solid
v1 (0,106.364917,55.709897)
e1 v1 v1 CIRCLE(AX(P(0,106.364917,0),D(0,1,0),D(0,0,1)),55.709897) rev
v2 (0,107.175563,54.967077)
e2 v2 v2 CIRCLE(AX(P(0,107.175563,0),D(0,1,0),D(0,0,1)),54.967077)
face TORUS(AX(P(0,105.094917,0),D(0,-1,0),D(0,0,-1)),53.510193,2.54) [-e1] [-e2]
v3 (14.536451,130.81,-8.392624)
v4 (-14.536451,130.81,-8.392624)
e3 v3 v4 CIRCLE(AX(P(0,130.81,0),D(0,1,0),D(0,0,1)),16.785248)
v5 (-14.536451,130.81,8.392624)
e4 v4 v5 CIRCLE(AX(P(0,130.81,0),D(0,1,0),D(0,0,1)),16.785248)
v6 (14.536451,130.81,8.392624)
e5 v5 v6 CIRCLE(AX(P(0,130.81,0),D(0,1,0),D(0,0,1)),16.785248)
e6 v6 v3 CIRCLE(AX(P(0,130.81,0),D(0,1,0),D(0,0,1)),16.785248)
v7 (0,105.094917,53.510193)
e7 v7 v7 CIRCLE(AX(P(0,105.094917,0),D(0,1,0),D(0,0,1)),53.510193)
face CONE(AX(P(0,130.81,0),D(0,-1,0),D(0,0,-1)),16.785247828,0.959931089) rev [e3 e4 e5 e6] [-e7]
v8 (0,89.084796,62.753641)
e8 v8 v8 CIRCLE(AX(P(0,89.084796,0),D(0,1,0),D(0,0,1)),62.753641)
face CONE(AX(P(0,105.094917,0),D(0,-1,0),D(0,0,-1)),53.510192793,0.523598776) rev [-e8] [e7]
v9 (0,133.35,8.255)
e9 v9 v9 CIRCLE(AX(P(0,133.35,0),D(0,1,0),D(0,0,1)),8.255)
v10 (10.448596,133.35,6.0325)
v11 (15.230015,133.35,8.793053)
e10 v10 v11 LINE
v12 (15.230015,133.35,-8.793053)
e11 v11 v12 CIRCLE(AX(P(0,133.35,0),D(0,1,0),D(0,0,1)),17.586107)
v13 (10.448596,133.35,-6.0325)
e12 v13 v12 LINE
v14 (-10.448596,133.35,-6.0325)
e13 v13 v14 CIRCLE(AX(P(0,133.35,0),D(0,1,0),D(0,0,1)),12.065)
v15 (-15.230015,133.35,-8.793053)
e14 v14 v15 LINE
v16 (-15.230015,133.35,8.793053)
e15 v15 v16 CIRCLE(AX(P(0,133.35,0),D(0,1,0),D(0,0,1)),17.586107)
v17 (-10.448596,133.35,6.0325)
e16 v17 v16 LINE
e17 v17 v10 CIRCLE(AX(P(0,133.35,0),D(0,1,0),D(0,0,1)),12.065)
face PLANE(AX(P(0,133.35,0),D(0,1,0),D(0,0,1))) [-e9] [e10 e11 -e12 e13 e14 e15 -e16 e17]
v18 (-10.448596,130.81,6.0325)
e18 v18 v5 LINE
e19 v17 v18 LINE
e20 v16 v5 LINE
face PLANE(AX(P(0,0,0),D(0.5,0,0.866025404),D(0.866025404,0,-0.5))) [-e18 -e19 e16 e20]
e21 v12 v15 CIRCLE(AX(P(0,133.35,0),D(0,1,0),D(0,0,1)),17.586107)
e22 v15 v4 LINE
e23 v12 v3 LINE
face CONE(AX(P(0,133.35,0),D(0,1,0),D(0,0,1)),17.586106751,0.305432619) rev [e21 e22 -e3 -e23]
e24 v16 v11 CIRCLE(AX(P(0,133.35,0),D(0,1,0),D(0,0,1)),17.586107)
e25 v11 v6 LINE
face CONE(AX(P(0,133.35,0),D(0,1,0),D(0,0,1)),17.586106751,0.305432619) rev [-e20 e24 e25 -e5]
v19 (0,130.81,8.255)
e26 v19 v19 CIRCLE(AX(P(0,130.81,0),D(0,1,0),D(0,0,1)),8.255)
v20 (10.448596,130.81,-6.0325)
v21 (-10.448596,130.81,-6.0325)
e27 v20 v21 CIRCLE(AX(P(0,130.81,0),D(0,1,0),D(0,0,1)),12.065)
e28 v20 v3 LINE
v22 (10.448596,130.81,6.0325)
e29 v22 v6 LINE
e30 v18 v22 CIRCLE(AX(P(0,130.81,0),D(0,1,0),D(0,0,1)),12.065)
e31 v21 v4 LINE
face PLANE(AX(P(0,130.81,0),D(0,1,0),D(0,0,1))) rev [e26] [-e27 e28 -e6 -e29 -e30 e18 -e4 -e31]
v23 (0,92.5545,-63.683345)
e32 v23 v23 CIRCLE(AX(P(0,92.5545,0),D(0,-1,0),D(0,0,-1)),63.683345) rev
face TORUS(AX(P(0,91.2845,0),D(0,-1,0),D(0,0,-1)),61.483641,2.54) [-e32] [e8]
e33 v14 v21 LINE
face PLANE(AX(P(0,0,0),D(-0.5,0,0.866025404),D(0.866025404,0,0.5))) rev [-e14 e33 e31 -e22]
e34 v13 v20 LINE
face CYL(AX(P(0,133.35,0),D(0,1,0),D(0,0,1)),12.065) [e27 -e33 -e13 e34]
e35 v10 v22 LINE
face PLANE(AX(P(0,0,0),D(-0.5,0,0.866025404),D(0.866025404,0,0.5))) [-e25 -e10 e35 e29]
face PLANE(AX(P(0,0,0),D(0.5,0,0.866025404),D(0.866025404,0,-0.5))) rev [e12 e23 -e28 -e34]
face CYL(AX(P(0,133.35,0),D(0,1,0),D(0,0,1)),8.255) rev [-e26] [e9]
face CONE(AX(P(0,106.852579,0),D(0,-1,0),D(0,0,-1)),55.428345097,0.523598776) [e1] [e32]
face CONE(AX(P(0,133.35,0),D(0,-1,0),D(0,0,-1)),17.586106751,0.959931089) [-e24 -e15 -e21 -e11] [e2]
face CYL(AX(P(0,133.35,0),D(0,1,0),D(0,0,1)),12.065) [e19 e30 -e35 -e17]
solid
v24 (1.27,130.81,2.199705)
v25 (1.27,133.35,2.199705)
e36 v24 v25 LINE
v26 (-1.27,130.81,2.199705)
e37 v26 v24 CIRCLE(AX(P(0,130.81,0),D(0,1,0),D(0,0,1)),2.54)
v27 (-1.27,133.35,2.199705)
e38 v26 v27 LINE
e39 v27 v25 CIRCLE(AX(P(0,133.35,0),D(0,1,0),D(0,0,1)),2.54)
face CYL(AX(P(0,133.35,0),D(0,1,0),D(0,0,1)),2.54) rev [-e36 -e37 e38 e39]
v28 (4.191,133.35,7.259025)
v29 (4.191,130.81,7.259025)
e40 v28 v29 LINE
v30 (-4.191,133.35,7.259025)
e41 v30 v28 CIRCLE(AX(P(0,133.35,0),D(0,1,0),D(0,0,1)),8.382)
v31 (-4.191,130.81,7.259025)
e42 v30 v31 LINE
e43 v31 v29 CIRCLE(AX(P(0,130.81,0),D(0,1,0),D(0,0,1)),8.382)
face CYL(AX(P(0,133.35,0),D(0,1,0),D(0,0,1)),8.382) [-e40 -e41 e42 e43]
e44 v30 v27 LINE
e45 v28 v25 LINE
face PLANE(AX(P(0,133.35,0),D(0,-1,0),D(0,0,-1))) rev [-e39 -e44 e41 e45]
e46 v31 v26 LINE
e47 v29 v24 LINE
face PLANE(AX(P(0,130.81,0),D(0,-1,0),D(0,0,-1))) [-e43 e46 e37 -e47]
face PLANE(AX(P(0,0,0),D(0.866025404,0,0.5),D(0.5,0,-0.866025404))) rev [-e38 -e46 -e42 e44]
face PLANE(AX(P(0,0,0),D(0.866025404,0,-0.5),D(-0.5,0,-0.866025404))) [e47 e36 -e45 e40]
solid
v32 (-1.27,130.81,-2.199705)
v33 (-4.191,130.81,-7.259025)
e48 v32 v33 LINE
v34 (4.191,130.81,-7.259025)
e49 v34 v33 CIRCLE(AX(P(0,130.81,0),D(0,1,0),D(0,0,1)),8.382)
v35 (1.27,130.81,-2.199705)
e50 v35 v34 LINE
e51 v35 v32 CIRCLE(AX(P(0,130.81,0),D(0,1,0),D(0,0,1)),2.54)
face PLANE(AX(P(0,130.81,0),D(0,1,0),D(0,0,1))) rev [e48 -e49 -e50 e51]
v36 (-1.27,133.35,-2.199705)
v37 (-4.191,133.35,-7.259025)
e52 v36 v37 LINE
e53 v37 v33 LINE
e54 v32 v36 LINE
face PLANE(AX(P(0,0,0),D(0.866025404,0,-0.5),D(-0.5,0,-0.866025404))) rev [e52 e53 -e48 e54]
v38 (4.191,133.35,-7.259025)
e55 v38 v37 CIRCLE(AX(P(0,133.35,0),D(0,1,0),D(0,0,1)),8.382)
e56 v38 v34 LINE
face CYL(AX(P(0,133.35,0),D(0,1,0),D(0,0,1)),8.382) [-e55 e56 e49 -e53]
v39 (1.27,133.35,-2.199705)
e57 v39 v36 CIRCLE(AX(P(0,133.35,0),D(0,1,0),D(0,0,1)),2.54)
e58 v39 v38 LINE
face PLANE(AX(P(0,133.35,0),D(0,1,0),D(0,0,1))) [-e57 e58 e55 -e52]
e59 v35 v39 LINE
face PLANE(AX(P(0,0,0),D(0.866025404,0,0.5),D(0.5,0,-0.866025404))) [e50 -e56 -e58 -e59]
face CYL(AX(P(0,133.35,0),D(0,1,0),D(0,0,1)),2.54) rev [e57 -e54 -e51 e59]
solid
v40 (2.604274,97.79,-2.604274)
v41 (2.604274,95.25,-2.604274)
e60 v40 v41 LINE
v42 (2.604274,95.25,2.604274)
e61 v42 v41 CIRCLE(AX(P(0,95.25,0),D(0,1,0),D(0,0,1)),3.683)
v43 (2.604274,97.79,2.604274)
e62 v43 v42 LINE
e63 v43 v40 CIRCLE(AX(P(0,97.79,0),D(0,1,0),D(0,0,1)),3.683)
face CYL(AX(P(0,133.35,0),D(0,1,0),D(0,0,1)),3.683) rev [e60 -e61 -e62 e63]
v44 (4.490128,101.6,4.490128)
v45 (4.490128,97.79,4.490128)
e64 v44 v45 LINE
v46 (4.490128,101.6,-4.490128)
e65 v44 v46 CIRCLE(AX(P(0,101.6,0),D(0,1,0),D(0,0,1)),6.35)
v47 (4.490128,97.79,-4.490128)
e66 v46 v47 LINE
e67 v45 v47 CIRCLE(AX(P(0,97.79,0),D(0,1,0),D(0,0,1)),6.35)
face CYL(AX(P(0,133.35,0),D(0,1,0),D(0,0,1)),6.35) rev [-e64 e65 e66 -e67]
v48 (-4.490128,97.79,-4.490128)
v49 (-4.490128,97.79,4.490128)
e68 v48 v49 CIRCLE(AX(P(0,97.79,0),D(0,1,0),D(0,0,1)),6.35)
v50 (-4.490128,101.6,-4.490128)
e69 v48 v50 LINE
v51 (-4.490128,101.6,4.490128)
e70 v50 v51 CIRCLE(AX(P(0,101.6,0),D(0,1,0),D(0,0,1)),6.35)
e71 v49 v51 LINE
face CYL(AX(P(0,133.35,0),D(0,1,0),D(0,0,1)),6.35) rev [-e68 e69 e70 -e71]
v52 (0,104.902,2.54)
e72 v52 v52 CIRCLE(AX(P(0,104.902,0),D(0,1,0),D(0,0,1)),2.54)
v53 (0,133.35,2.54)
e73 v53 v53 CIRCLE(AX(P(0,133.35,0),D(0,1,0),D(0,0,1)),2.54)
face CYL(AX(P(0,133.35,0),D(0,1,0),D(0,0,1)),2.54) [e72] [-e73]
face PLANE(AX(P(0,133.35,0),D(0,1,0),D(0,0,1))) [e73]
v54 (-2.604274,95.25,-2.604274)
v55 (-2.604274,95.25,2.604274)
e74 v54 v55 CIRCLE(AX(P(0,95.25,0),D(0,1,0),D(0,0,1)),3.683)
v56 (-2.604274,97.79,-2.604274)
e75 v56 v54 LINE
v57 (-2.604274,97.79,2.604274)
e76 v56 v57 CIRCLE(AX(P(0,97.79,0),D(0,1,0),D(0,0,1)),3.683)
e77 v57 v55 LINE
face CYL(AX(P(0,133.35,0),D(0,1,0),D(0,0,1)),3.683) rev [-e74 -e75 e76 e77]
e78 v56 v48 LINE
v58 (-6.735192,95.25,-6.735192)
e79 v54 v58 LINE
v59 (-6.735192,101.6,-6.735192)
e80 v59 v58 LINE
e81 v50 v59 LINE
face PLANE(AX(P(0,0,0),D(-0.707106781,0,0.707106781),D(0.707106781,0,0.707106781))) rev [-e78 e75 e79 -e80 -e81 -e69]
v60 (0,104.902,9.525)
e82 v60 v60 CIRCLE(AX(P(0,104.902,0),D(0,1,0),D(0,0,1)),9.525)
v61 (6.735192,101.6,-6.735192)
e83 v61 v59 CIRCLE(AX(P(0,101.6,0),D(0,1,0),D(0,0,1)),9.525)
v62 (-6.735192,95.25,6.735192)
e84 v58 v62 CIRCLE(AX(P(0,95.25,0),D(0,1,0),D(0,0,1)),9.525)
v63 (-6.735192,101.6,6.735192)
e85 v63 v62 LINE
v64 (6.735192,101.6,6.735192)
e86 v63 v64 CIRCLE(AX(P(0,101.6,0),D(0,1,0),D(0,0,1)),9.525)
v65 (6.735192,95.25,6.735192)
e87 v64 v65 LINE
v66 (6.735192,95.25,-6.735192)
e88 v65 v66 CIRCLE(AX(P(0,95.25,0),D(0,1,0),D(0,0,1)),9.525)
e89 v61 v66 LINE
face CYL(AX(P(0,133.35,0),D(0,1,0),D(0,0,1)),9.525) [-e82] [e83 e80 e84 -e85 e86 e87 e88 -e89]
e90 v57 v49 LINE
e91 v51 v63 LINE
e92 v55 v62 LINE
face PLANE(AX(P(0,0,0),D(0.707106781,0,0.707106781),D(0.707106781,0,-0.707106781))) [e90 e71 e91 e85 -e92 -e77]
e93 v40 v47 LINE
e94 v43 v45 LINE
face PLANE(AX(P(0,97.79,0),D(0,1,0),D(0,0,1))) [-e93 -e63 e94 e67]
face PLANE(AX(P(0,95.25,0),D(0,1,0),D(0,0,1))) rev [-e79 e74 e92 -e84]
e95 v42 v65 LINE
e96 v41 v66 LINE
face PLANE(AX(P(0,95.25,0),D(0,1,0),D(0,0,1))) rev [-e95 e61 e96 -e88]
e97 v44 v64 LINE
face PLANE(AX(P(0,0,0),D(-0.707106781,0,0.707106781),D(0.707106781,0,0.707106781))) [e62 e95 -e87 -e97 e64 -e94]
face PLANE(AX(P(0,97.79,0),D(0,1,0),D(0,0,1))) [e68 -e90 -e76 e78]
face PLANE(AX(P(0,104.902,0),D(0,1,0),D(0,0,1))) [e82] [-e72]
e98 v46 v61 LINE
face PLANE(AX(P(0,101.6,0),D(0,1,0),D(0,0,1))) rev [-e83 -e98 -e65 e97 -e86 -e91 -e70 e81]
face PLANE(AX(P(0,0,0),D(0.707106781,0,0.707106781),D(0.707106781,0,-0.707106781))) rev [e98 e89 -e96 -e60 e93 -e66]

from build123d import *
from build123d.topology import SkipClean

# Parameters (mm, degrees)
REVOLVE5_ANGLE  = 90
SKETCH1_24_W    = 2.54
SKETCH1_24_H    = 25.908
SKETCH1_24_H_2  = 2.54
SKETCH1_24_W_2  = 3.81
REVOLVE9_ANGLE  = 60
SKETCH2_W       = 5.842
SKETCH2_H       = 2.54
REVOLVE10_ANGLE = 60
FILLET1_R       = 2.54
FILLET2_R       = 2.54


with BuildPart() as part:
    # Sketch1 → Revolve4 (revolve)
    with BuildSketch(Plane.XY, mode=Mode.PRIVATE) as revolve4_sk:
        Polygon((9.525, 101.6), (9.525, 104.902), (2.54, 104.902), (0, 104.902), (0, 101.6), (6.35, 101.6), align=None)
    revolve(revolve4_sk.sketch.rotate(Axis((0, 133.35, 0), (0, -1, 0)), 90), axis=Axis((0, 133.35, 0), (0, -1, 0)))

    # Sketch1<21> → Revolve5 (revolve, symmetric)
    with SkipClean():  # the faces are left unmerged after this step: merging them gives an invalid solid
        with BuildSketch(Plane.XY) as revolve5_sk:
            Polygon((9.525, 95.25), (9.525, 101.6), (6.35, 101.6), (6.35, 97.79), (3.683, 97.79), (3.683, 95.25), align=None)
            Polygon((-6.35, 97.79), (-6.35, 101.6), (-9.525, 101.6), (-9.525, 95.25), (-3.683, 95.25), (-3.683, 97.79), align=None)
        revolve(axis=Axis((0, 133.35, 0), (0, -1, 0)), revolution_arc=REVOLVE5_ANGLE / 2)
        revolve(revolve5_sk.sketch, axis=Axis((0, 133.35, 0), (0, 1, 0)), revolution_arc=REVOLVE5_ANGLE / 2)
    add(part.part.scale(1), mode=Mode.REPLACE)  # the faces are merged on a copy

    # Sketch1<24> → Revolve7 (revolve)
    with BuildSketch(Plane.XY, mode=Mode.PRIVATE) as revolve7_sk:
        with Locations((1.27, 117.856)):
            Rectangle(SKETCH1_24_W, SKETCH1_24_H)
        with Locations((1.27, 132.08)):
            Rectangle(SKETCH1_24_W, SKETCH1_24_H_2)
        Polygon((53.510192793, 105.094916695), (62.753640571, 89.084795506), (64.953345097, 90.354795506), (55.428345097, 106.852579448), (17.586106751, 133.35), (16.785247828, 130.81), align=None)
        with Locations((10.16, 132.08)):
            Rectangle(SKETCH1_24_W_2, SKETCH1_24_H_2)
    revolve(revolve7_sk.sketch.rotate(Axis((0, 133.35, 0), (0, -1, 0)), 270), axis=Axis((0, 133.35, 0), (0, -1, 0)))


with BuildPart() as revolve7_piece_1:
    # of the separate pieces the step leaves, piece 1, a body of its own (revolve7_pieces)
    add(part.part.solids().sort_by_distance((0, 105.094916695, -53.510192793))[0])



with BuildPart() as revolve7_piece_2:
    # of the separate pieces the step leaves, piece 2, a body of its own (revolve7_pieces)
    add(part.part.solids().sort_by_distance((0, 101.6, 9.525))[0])


with BuildPart() as revolve7_piece_3:
    # of the separate pieces the step leaves, piece 3, a body of its own (revolve7_pieces)
    add(part.part.solids().sort_by_distance((0, 133.35, -8.255))[0])


with BuildPart() as revolve7_piece_1_1:
    add(revolve7_piece_1.part)

    add(revolve7_piece_3.part)  # Revolve9 merges Revolve7 piece 3
    # Sketch1<29> → Revolve9 (revolve, symmetric)
    with BuildSketch(Plane.XY) as revolve9_sk:
        Polygon((12.065, 133.35), (12.065, 130.81), (16.785247828, 130.81), (17.586106751, 133.35), align=None)
        Polygon((-16.785247828, 130.81), (-12.065, 130.81), (-12.065, 133.35), (-17.586106751, 133.35), align=None)
    revolve(axis=Axis((0, 133.35, 0), (0, -1, 0)), revolution_arc=REVOLVE9_ANGLE / 2)
    revolve(revolve9_sk.sketch, axis=Axis((0, 133.35, 0), (0, 1, 0)), revolution_arc=REVOLVE9_ANGLE / 2)

    # Fillet1
    fillet1_edges = [revolve7_piece_1_1.edges().sort_by_distance(p)[0] for p in [
        (0, 90.354795506, 64.953345097),
    ]]
    fillet(fillet1_edges, radius=FILLET1_R - 0.0001)  # a hair under: the kernel refuses the full size

    # Fillet2
    fillet2_edges = [revolve7_piece_1_1.edges().sort_by_distance(p)[0] for p in [
        (0, 106.852579448, 55.428345097),
    ]]
    fillet(fillet2_edges, radius=FILLET2_R)


with BuildPart() as body_3:
    # Sketch2 → Revolve10 (revolve, symmetric)
    with BuildSketch(Plane(origin=(0, 0, 0), x_dir=(0, 0, -1), z_dir=(1, 0, 0))) as revolve10_sk:
        with Locations((-5.461, 132.08)):
            Rectangle(SKETCH2_W, SKETCH2_H)
        with Locations((5.461, 132.08)):
            Rectangle(SKETCH2_W, SKETCH2_H)
    revolve(axis=Axis((0, 133.35, 0), (0, -1, 0)), revolution_arc=REVOLVE10_ANGLE / 2)
    revolve(revolve10_sk.sketch, axis=Axis((0, 133.35, 0), (0, 1, 0)), revolution_arc=REVOLVE10_ANGLE / 2)


solid = Compound([revolve7_piece_2.part, revolve7_piece_1_1.part, body_3.part])
